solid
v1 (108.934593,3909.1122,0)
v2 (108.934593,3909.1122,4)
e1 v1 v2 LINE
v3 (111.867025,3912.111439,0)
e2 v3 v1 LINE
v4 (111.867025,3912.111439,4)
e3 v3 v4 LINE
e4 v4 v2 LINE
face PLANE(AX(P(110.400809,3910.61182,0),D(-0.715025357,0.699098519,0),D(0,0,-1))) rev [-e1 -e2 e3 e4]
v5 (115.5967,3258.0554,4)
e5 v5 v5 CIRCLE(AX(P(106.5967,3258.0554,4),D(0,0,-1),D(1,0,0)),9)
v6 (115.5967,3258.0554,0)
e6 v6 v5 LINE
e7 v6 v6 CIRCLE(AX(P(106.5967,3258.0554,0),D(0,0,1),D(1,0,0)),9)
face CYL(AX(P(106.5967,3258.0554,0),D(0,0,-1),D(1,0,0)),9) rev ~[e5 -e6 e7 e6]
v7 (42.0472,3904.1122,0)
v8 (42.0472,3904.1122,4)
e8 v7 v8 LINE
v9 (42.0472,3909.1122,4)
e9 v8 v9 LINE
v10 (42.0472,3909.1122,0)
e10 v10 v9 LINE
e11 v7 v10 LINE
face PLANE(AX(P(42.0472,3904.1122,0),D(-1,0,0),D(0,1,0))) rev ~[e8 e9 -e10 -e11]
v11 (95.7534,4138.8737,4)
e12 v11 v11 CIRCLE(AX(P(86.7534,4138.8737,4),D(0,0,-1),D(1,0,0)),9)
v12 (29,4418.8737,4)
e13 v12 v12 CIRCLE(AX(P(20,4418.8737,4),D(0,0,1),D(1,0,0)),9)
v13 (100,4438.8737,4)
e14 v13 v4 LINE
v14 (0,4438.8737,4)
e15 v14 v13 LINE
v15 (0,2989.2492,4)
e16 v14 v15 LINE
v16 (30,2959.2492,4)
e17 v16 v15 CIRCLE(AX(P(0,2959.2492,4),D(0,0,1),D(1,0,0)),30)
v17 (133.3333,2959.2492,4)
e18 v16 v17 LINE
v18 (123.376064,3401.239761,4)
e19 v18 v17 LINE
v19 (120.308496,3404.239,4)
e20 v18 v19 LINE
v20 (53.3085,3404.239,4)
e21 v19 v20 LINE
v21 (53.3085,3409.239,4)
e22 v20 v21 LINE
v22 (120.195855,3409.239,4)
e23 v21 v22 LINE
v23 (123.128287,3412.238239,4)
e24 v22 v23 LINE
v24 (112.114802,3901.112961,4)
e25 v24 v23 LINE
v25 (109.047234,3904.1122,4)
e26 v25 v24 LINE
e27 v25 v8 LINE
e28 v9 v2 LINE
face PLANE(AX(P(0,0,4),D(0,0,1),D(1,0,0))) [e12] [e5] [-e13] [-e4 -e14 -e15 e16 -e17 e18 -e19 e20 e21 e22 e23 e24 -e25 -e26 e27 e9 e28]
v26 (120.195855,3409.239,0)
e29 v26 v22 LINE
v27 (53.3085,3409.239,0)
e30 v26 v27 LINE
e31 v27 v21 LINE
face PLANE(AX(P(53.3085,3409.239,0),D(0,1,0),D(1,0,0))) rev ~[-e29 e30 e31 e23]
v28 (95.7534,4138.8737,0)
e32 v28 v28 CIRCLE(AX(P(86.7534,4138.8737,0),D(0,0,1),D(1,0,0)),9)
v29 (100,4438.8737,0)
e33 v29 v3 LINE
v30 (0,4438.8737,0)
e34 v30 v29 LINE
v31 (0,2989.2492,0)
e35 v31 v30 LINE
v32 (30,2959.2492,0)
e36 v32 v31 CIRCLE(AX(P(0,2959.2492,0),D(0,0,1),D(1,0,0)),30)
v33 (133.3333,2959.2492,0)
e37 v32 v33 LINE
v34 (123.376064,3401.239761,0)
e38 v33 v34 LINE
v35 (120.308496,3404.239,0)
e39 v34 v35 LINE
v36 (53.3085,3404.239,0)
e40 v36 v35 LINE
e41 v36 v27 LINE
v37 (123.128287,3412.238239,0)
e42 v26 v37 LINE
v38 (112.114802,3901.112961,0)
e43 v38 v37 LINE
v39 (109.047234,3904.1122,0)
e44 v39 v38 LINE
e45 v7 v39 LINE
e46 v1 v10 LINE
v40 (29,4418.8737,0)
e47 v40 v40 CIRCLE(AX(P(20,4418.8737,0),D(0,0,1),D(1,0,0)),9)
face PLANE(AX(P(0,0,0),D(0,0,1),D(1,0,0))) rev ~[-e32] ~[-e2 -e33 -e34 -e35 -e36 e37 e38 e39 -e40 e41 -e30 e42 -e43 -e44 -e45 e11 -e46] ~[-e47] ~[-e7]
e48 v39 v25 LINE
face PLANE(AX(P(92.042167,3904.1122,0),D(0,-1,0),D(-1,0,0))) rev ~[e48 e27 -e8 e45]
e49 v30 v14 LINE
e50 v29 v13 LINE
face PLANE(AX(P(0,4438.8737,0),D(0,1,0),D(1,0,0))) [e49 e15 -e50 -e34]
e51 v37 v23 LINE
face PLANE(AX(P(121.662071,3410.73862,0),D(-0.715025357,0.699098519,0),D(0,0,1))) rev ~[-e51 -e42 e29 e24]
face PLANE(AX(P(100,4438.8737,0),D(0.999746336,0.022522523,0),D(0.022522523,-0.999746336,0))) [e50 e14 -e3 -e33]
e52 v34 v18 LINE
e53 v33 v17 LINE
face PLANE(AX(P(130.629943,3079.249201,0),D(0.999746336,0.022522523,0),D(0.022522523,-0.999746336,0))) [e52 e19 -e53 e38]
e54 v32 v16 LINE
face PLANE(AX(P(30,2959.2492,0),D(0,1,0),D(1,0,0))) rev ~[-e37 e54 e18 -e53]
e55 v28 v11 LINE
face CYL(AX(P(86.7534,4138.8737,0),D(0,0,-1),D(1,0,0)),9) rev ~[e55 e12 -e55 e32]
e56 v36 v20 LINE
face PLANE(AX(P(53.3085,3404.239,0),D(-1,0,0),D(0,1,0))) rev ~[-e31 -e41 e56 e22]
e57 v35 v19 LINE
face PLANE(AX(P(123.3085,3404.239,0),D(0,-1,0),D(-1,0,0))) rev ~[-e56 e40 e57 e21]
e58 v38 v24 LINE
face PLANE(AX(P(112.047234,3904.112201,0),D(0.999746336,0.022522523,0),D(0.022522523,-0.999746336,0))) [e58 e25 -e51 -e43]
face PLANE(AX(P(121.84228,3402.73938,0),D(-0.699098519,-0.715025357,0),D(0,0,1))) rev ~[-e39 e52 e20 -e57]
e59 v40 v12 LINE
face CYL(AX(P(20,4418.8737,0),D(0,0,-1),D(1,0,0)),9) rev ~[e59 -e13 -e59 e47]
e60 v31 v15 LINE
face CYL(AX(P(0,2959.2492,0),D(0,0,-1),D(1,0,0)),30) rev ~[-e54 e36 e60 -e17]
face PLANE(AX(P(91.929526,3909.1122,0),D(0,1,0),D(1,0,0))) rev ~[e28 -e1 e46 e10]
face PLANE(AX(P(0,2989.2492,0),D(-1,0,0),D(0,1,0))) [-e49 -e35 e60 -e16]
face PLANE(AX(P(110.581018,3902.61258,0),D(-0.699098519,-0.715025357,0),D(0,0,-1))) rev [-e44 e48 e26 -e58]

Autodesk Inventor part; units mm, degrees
ref_plane "YZ Plane" through (0, 0, 0) normal (1, 0, 0) x (0, 1, 0)
ref_plane "XZ Plane" through (0, 0, 0) normal (0, 1, 0) x (-1, 0, 0)
ref_plane "XY Plane" through (0, 0, 0) normal (0, 0, 1) x (1, 0, 0)
sketch "Sketch1" plane through (0, 0, 0) normal (0, 0, 1) x (1, 0, 0)
  line L0 (0, 0) -> (0, 4438.8737)
  line L1 (0, 4438.8737) -> (100, 4438.8737)
  line L2 (100, 4438.8737) -> (200, 0)
  line L3 (200, 0) -> (0, 0)
  circle A0 centre (0, 0) radius 30
  line L4 (0, 1479.6246) -> (166.6667, 1479.6246)
  line L5 (0, 2959.2492) -> (133.3333, 2959.2492)
  circle A1 centre (0, 1479.6246) radius 30
  circle A2 centre (0, 2959.2492) radius 30
  line L6 (190.8761, 405) -> (120.8761, 405)
  line L7 (120.8761, 405) -> (120.8761, 410)
  line L8 (120.8761, 410) -> (190.8761, 410)
  line L9 (190.8761, 410) -> (190.8761, 405)
  line L10 (109.6148, 909.8732) -> (179.6148, 909.8732)
  line L11 (179.6148, 904.8732) -> (109.6148, 904.8732)
  line L12 (109.6148, 904.8732) -> (109.6148, 909.8732)
  line L13 (179.6148, 909.8732) -> (179.6148, 904.8732)
  line L14 (98.3535, 1409.7463) -> (168.3535, 1409.7463)
  line L15 (168.3535, 1404.7463) -> (98.3535, 1404.7463)
  line L16 (98.3535, 1404.7463) -> (98.3535, 1409.7463)
  line L17 (168.3535, 1409.7463) -> (168.3535, 1404.7463)
  line L18 (87.0923, 1909.6195) -> (157.0923, 1909.6195)
  line L19 (157.0923, 1904.6195) -> (87.0923, 1904.6195)
  line L20 (87.0923, 1904.6195) -> (87.0923, 1909.6195)
  line L21 (157.0923, 1909.6195) -> (157.0923, 1904.6195)
  line L22 (75.831, 2409.4927) -> (145.831, 2409.4927)
  line L23 (145.831, 2404.4927) -> (75.831, 2404.4927)
  line L24 (75.831, 2404.4927) -> (75.831, 2409.4927)
  line L25 (145.831, 2409.4927) -> (145.831, 2404.4927)
  line L26 (64.5698, 2909.3658) -> (134.5698, 2909.3658)
  line L27 (134.5698, 2904.3658) -> (64.5698, 2904.3658)
  line L28 (64.5698, 2904.3658) -> (64.5698, 2909.3658)
  line L29 (134.5698, 2909.3658) -> (134.5698, 2904.3658)
  line L30 (53.3085, 3409.239) -> (123.3085, 3409.239)
  line L31 (123.3085, 3404.239) -> (53.3085, 3404.239)
  line L32 (53.3085, 3404.239) -> (53.3085, 3409.239)
  line L33 (123.3085, 3409.239) -> (123.3085, 3404.239)
  line L34 (42.0472, 3909.1122) -> (112.0472, 3909.1122)
  line L35 (112.0472, 3904.1122) -> (42.0472, 3904.1122)
  line L36 (42.0472, 3904.1122) -> (42.0472, 3909.1122)
  line L37 (112.0472, 3909.1122) -> (112.0472, 3904.1122)
  line L38 (0, 1629.6246) -> (163.2874, 1629.6246)
  line L39 (0, 3079.2492) -> (130.6299, 3079.2492)
  circle A3 centre (20, 4418.8737) radius 9
  circle A4 centre (106.5967, 3258.0554) radius 9
  circle A5 centre (86.7534, 4138.8737) radius 9
  line L40 (86.7534, 4138.8737) -> (106.5967, 3258.0554)
  point P0 (30, 2959.2492)
  point P1 (0, 2929.2492)
  point P2 (0, 1509.6246)
  point P3 (0, 1449.6246)
  point P4 (0, 30)
  point P5 (30, 0)
  point P6 (190.7634, 410)
  point P7 (179.5022, 909.8732)
  point P8 (168.3535, 1404.7463)
  point P9 (168.2409, 1409.7463)
  point P10 (30, 1479.6246)
  point P11 (157.0923, 1904.6195)
  point P12 (156.9796, 1909.6195)
  point P13 (145.831, 2404.4927)
  point P14 (145.7184, 2409.4927)
  point P15 (134.5698, 2904.3658)
  point P16 (134.4571, 2909.3658)
  point P17 (0, 2989.2492)
  point P18 (123.3085, 3404.239)
  point P19 (123.1959, 3409.239)
  point P20 (112.0472, 3904.1122)
  point P21 (111.9346, 3909.1122)
  dimension "d65" = 100
  dimension "d67" = 200
  dimension "d68" = 60
  dimension "d69" = 1480
  dimension "d70" = 1480
  dimension "d71" = 1480
  dimension "d72" = 5
  dimension "d73" = 70
  dimension "d74" = 410
  dimension "d77" = 500
  dimension "d82" = 120
  dimension "d83" = 150
  dimension "d88" = 18
  dimension "d91" = 20
  dimension "d92" = 20
  dimension "d93" = 20
  dimension "d94" = 300
  dimension "d95" = 300
extrude "Plate3" add sketch "Sketch1" along normal blind 4 contours L39 L2 L5 A2 L0 | L0 L1 L2 L34 L36 L35 L40 L30 L32 L31 L39 | L30 L40 L35 L2
chamfer "Corner Chamfer2" distance 3 angle 45 4 edges at (123.3085, 3404.239, 2) (123.1959, 3409.239, 2) (112.0472, 3904.1122, 2) (111.9346, 3909.1122, 2)
equation "\"BendRadius\" = Thickness"
equation "\"BendReliefWidth\" = Thickness"
equation "\"BendReliefDepth\" = 0.5 * Thickness"
equation "\"CornerReliefSize\" = 4 * Thickness"
equation "\"MinimumRemnant\" = 2 * Thickness"
equation "\"TransitionRadius\" = BendRadius"
equation "\"JacobiRadiusSize\" = BendRadius"
equation "\"GapSize\" = Thickness"
equation "\"Thickness\" = 4"
properties part number "GBK 3315 central third rib" material "Steel"
